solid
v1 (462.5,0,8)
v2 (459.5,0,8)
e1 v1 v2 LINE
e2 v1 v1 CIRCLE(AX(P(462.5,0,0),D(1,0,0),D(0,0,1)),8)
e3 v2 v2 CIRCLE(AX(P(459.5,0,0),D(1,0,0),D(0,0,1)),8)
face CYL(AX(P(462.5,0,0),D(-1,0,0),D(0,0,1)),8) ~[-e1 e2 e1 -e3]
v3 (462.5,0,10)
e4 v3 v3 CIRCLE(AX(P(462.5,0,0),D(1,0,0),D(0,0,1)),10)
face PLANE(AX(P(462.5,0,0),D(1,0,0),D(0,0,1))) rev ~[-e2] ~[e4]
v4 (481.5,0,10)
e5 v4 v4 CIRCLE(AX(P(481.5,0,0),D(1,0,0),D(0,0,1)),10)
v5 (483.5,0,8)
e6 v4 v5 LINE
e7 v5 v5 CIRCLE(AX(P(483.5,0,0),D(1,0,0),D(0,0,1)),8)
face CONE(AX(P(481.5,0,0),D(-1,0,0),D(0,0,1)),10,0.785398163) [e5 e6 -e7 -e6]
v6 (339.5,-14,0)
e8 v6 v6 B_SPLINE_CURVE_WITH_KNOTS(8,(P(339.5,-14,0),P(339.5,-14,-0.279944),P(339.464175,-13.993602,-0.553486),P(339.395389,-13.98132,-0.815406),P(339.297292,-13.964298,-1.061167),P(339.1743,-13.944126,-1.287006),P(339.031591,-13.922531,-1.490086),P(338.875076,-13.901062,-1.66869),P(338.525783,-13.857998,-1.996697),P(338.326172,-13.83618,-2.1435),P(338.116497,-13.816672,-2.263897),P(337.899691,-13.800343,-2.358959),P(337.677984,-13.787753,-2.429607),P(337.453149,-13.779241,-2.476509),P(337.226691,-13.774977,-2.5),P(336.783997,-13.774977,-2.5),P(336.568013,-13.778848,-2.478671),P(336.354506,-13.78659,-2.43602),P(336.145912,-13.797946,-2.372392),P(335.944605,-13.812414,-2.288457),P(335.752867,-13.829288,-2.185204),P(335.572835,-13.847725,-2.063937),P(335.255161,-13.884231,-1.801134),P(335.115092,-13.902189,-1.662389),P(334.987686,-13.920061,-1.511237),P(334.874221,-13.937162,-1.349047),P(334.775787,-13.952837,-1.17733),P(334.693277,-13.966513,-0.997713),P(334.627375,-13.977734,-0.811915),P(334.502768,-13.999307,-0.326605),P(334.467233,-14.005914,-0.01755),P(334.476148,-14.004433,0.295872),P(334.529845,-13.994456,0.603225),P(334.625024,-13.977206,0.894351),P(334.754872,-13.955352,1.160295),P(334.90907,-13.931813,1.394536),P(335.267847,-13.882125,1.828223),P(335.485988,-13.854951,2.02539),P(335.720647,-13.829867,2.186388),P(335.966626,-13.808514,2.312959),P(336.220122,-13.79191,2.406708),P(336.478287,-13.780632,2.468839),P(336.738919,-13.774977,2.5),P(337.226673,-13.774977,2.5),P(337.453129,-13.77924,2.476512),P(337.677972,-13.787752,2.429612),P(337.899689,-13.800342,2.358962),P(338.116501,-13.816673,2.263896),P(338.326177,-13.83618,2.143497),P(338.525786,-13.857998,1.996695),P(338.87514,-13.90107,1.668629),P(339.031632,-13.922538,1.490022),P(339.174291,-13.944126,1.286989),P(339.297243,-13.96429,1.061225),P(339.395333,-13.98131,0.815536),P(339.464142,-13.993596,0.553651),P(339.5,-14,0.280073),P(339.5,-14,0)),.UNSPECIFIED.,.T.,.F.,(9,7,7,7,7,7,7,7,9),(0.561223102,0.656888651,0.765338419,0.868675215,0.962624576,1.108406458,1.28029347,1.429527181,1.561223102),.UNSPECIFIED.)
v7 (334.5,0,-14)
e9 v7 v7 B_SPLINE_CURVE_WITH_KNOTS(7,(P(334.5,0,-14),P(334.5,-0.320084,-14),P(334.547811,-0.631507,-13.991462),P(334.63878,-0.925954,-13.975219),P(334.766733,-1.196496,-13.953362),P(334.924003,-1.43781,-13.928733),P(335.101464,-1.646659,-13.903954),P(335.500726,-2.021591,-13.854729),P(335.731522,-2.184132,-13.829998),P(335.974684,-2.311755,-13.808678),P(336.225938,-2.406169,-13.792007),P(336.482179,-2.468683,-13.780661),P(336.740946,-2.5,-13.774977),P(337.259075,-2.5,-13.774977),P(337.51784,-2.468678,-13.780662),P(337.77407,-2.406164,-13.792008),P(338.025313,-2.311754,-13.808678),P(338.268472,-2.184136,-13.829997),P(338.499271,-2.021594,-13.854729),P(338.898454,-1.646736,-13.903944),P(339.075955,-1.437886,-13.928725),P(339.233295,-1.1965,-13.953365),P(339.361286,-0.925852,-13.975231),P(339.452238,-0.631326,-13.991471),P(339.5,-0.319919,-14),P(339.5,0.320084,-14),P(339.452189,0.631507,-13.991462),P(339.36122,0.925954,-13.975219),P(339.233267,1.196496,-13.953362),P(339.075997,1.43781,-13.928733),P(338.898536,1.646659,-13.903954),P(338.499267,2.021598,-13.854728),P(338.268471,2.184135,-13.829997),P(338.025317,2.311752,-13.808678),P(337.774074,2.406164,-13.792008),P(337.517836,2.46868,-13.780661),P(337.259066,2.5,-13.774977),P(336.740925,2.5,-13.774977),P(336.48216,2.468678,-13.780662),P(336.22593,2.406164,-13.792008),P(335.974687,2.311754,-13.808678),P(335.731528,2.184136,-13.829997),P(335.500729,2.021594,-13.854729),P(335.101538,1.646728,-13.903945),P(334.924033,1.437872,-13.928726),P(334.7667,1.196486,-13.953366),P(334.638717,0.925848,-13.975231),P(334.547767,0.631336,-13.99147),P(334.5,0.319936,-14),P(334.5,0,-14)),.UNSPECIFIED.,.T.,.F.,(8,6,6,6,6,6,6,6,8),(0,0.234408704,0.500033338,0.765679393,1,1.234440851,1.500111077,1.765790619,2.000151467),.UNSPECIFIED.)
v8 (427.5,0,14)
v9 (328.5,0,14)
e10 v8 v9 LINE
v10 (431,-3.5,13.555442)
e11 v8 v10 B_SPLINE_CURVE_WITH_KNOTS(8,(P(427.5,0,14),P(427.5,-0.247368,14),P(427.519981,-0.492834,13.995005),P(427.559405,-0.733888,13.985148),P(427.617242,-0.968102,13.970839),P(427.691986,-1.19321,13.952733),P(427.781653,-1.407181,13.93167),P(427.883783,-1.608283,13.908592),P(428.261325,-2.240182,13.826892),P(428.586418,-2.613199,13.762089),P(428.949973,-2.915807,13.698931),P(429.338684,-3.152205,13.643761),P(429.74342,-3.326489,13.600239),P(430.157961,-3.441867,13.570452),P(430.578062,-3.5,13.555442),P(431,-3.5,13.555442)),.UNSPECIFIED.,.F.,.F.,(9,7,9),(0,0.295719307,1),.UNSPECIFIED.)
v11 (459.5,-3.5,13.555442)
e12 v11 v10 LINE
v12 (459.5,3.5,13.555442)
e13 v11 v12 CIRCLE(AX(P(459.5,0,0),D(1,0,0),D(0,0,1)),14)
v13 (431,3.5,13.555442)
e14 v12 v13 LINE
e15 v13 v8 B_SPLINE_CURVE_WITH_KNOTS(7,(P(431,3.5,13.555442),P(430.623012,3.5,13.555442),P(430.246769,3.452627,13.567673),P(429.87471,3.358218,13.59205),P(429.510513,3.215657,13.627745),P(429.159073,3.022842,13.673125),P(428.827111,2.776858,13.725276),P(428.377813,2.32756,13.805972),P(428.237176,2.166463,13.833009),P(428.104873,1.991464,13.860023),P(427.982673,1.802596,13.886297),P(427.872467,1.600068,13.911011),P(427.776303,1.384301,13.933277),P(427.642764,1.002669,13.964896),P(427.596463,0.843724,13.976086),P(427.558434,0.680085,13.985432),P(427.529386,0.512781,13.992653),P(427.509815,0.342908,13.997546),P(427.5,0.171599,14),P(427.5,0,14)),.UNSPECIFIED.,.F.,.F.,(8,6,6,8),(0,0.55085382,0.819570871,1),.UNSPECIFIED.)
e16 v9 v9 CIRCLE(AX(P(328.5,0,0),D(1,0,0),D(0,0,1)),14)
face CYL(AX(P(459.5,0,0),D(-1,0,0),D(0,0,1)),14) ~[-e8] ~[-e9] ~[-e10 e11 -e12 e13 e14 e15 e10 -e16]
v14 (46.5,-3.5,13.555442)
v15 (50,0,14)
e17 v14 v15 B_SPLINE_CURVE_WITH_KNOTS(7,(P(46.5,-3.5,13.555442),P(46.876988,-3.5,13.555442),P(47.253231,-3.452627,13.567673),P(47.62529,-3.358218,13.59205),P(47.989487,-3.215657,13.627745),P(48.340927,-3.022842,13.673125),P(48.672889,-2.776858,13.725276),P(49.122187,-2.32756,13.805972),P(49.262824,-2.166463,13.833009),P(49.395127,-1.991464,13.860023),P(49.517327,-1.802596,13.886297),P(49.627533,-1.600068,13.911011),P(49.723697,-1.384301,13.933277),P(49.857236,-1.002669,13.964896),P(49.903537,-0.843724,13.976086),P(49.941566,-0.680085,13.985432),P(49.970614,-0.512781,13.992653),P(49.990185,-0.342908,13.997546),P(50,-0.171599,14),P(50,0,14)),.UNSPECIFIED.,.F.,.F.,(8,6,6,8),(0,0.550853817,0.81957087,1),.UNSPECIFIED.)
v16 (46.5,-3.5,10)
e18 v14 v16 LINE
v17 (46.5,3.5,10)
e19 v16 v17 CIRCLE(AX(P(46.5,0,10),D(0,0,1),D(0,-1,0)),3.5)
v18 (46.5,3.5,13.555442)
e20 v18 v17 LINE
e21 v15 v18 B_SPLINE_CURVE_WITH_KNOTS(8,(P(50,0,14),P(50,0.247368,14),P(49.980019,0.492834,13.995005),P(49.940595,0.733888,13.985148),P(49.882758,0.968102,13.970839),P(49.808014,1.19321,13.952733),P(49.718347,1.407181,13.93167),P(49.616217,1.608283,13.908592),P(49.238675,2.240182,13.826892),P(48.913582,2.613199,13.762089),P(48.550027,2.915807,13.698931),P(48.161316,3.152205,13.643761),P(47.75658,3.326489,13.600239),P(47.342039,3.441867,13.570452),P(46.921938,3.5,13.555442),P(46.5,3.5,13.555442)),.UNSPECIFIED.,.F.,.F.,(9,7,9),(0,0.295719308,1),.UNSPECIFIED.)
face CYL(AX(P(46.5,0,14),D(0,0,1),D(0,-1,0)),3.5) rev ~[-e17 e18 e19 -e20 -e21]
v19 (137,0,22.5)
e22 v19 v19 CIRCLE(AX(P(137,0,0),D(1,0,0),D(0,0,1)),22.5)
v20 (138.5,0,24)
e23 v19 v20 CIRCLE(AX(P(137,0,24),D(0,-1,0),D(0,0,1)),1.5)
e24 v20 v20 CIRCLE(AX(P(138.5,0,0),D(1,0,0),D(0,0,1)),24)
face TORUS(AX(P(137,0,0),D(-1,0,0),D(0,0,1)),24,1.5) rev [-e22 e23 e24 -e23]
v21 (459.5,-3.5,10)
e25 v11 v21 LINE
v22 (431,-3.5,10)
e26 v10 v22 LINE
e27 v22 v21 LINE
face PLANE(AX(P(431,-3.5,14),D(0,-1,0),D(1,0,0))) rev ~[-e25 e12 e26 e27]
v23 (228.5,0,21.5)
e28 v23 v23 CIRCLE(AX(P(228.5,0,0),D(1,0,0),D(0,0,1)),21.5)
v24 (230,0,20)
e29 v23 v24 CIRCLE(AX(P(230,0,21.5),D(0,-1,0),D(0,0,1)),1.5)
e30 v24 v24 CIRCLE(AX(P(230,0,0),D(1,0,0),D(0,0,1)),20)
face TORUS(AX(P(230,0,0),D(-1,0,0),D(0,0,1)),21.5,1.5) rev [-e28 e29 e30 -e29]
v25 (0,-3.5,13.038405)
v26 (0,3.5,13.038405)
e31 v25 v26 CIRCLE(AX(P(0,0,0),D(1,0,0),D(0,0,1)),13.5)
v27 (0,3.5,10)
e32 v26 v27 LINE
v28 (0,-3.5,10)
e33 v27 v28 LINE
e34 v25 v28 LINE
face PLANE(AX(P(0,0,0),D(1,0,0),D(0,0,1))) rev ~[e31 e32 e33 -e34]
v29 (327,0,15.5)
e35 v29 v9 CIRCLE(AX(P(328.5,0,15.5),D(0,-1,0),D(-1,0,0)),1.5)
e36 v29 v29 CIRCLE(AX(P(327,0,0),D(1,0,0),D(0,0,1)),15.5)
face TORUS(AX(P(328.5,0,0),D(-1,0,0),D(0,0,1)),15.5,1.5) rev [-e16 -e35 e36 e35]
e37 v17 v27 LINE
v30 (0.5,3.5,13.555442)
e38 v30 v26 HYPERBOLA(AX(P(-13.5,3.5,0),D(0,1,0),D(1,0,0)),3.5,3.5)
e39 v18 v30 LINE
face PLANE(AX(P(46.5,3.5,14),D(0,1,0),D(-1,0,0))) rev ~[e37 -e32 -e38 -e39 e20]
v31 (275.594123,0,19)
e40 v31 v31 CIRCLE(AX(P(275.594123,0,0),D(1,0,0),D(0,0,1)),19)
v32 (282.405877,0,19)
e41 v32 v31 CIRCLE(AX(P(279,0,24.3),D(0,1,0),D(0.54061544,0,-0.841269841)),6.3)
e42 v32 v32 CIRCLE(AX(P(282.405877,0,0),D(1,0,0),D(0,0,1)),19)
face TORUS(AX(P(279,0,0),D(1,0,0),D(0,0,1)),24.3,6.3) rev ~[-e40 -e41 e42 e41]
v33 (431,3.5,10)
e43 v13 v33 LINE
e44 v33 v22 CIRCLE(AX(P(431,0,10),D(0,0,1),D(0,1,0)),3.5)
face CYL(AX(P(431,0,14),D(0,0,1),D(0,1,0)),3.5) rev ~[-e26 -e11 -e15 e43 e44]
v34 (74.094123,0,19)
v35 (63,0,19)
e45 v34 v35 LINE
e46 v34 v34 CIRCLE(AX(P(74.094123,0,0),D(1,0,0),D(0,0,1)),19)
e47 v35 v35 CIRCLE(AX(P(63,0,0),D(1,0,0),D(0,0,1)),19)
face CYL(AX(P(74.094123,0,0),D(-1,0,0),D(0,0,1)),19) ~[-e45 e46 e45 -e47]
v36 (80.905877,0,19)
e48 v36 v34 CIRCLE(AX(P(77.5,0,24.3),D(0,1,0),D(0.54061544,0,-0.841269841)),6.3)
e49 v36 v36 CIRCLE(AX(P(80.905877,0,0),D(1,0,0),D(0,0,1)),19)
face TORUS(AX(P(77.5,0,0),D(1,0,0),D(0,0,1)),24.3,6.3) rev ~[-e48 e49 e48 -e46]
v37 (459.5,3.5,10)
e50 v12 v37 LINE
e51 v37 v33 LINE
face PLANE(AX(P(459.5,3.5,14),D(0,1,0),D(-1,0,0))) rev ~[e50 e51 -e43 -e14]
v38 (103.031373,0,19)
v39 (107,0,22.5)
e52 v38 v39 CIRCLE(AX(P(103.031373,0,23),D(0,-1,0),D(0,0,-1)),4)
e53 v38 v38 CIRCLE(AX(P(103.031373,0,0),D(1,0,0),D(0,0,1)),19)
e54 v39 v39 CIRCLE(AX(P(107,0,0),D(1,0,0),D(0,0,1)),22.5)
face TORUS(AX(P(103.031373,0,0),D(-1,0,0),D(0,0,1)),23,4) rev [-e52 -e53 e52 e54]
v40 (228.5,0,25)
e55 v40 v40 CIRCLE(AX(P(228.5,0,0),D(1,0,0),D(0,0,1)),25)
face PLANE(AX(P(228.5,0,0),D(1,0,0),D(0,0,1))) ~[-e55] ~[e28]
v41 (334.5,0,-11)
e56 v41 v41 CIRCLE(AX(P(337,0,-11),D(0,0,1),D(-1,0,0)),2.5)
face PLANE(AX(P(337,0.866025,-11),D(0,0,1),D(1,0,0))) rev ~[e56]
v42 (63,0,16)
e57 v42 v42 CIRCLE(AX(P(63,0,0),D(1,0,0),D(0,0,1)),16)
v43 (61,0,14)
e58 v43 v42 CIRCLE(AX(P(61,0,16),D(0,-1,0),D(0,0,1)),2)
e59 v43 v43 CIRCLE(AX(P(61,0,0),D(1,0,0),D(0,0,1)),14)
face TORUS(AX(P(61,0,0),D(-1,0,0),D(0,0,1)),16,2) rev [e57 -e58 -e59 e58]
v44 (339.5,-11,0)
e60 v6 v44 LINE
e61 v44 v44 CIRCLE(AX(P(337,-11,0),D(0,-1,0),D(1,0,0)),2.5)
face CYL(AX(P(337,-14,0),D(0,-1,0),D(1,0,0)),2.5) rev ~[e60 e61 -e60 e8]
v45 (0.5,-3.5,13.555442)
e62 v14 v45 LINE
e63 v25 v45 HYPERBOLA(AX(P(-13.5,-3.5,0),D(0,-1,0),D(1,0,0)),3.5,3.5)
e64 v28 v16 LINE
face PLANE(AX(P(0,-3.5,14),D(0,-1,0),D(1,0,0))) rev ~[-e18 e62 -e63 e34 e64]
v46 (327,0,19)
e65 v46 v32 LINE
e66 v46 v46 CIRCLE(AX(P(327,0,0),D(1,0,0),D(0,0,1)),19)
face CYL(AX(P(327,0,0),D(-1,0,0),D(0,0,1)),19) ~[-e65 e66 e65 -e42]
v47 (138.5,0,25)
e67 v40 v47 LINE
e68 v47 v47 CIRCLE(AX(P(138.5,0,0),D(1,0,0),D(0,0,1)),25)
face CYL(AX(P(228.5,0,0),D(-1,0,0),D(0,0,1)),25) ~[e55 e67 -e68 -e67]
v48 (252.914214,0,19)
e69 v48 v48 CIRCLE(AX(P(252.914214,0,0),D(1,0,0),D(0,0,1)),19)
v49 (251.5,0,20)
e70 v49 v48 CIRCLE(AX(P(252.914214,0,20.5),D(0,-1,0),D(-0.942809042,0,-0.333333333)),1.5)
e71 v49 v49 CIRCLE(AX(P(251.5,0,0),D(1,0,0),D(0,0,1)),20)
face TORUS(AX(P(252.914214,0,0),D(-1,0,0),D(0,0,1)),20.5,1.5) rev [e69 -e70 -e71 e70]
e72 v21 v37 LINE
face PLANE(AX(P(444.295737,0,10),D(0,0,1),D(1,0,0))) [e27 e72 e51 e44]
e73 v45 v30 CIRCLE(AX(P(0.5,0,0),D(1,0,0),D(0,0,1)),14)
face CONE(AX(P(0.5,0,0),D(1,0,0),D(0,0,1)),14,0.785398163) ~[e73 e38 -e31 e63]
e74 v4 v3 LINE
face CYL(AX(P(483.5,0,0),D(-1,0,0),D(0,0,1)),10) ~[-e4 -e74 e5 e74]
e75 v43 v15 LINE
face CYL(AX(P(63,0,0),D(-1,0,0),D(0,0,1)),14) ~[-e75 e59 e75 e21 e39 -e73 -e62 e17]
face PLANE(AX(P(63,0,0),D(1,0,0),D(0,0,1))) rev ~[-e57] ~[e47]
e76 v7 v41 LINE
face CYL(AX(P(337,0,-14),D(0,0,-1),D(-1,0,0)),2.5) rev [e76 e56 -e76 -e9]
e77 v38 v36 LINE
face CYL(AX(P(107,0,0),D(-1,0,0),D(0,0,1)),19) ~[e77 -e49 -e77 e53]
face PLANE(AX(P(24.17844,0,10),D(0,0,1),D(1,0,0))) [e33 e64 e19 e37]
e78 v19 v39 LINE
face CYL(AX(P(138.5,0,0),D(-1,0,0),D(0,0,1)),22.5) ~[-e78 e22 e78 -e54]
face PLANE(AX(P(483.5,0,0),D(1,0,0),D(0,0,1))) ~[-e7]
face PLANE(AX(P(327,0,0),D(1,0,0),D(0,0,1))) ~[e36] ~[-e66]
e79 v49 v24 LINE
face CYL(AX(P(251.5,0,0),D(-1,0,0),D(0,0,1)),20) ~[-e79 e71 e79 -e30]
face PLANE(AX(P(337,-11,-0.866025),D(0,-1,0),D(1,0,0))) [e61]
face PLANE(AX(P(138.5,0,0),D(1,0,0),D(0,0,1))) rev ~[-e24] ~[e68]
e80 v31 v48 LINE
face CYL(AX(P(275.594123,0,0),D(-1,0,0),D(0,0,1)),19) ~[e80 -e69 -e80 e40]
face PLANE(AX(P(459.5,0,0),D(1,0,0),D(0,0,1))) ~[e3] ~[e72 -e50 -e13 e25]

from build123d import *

# Parameters (mm, degrees)
F2_SIZE   = 0.5
F3_R      = 2
F5_R      = 1.5
F6_R      = 1.5
F8_SIZE   = 2
F11_DEPTH = 4
F13_DEPTH = 4
F16_DEPTH = 3
F19_DEPTH = 3


# Not quite as in the source:
# - a fillet or chamfer that OpenCascade refuses, or shapes differently, is made with other operations: its cross-section is extruded or revolved along the edge and cut away or added


with BuildPart() as f1:
    # F0 (on Front) → F1 (revolve)
    with BuildSketch(Plane.XZ):
        with BuildLine():
            Line((63, 14), (0, 14))
            Line((0, 14), (0, 0))
            Line((0, 0), (483.5, 0))
            Line((483.5, 0), (483.5, 10))
            Line((483.5, 10), (462.5, 10))
            Line((462.5, 10), (462.5, 8))
            Line((462.5, 8), (459.5, 8))
            Line((459.5, 8), (459.5, 14))
            Line((459.5, 14), (327, 14))
            Line((327, 14), (327, 19))
            Line((327, 19), (282.4058772732, 19))
            ThreePointArc((282.4058772732, 19), (279, 18), (275.5941227268, 19))
            Line((275.5941227268, 19), (251.5, 19))
            Line((251.5, 19), (251.5, 20))
            Line((251.5, 20), (228.5, 20))
            Line((228.5, 20), (228.5, 25))
            Line((228.5, 25), (138.5, 25))
            Line((138.5, 25), (138.5, 22.5))
            Line((138.5, 22.5), (107, 22.5))
            Line((107, 22.5), (107, 19))
            Line((107, 19), (80.9058772732, 19))
            ThreePointArc((80.9058772732, 19), (77.5, 18), (74.0941227268, 19))
            Line((74.0941227268, 19), (63, 19))
            Line((63, 19), (63, 14))
        make_face()
    revolve(axis=Axis((247.1050164511, 0, 0), (1, 0, 0)))

    # F2
    f2_edges = [f1.edges().sort_by_distance(p)[0] for p in [
        (0, 0, -14),
    ]]
    chamfer(f2_edges, length=F2_SIZE)

    # F3
    f3_edges = [f1.edges().sort_by_distance(p)[0] for p in [
        (63, 0, -14),
    ]]
    fillet(f3_edges, radius=F3_R)

    # F4: fillet of radius 4 on 1 edges, made by hand

    # F4_s1 → F4_t2 (revolve)
    with BuildSketch(Plane.XZ):
        with BuildLine():
            ThreePointArc((103.0313730334, 19), (105.6771243445, 20), (107, 22.5))
            Line((107, 22.5), (107, 19))
            Line((107, 19), (103.0313730334, 19))
        make_face()
    revolve(axis=Axis((107, 0, 0), (1, 0, 0)))

    # F5
    f5_edges = [f1.edges().sort_by_distance(p)[0] for p in [
        (138.5, 0, -22.5),
    ]]
    fillet(f5_edges, radius=F5_R)

    # F6
    f6_edges = [f1.edges().sort_by_distance(p)[0] for p in [
        (228.5, 0, -20),
    ]]
    fillet(f6_edges, radius=F6_R)

    # F7: fillet of radius 1.5 on 2 edges, made by hand

    # F7_s1 → F7_t2 (revolve)
    with BuildSketch(Plane.XZ):
        with BuildLine():
            ThreePointArc((251.5, 20), (252.0481881586, 19.2752551286), (252.9142135624, 19))
            Line((252.9142135624, 19), (251.5, 19))
            Line((251.5, 19), (251.5, 20))
        make_face()
    revolve(axis=Axis((251.5, 0, 0), (1, 0, 0)))

    # F7_s3 → F7_t4 (revolve)
    with BuildSketch(Plane.XZ):
        with BuildLine():
            ThreePointArc((327, 15.5), (327.4393398282, 14.4393398282), (328.5, 14))
            Line((328.5, 14), (327, 14))
            Line((327, 14), (327, 15.5))
        make_face()
    revolve(axis=Axis((327, 0, 0), (1, 0, 0)))

    # F8
    f8_edges = [f1.edges().sort_by_distance(p)[0] for p in [
        (483.5, 0, -10),
    ]]
    chamfer(f8_edges, length=F8_SIZE)

    # F10 (on offset) → F11 (cut)
    with BuildSketch(Plane.XY.offset(14)):
        with BuildLine():
            Line((46.5, 3.5), (0, 3.5))
            Line((0, 3.5), (0, -3.5))
            Line((0, -3.5), (46.5, -3.5))
            ThreePointArc((46.5, -3.5), (50, 0), (46.5, 3.5))
        make_face()
    extrude(amount=-F11_DEPTH, mode=Mode.SUBTRACT)

    # F12 (on offset) → F13 (cut)
    with BuildSketch(Plane.XY.offset(14)):
        with BuildLine():
            Line((431, -3.5), (459.5, -3.5))
            Line((459.5, -3.5), (459.5, 3.5))
            Line((459.5, 3.5), (431, 3.5))
            ThreePointArc((431, 3.5), (427.5, 0), (431, -3.5))
        make_face()
    extrude(amount=-F13_DEPTH, mode=Mode.SUBTRACT)

    # F15 (on offset) → F16 (cut)
    with BuildSketch(Plane.XZ.offset(14)):
        with BuildLine():
            ThreePointArc((334.5, 0), (337, -2.5), (339.5, 0))
            Line((339.5, 0), (334.5, 0))
        make_face()
        with BuildLine():
            Line((334.5, 0), (339.5, 0))
            ThreePointArc((339.5, 0), (337, 2.5), (334.5, 0))
        make_face()
    extrude(amount=-F16_DEPTH, mode=Mode.SUBTRACT)

    # F18 (on offset) → F19 (cut)
    with BuildSketch(Plane.XY.offset(-14)):
        with BuildLine():
            ThreePointArc((339.5, 0), (337, 2.5), (334.5, 0))
            Line((334.5, 0), (339.5, 0))
        make_face()
        with BuildLine():
            Line((339.5, 0), (334.5, 0))
            ThreePointArc((334.5, 0), (337, -2.5), (339.5, 0))
        make_face()
    extrude(amount=F19_DEPTH, mode=Mode.SUBTRACT)


solid = f1.part
